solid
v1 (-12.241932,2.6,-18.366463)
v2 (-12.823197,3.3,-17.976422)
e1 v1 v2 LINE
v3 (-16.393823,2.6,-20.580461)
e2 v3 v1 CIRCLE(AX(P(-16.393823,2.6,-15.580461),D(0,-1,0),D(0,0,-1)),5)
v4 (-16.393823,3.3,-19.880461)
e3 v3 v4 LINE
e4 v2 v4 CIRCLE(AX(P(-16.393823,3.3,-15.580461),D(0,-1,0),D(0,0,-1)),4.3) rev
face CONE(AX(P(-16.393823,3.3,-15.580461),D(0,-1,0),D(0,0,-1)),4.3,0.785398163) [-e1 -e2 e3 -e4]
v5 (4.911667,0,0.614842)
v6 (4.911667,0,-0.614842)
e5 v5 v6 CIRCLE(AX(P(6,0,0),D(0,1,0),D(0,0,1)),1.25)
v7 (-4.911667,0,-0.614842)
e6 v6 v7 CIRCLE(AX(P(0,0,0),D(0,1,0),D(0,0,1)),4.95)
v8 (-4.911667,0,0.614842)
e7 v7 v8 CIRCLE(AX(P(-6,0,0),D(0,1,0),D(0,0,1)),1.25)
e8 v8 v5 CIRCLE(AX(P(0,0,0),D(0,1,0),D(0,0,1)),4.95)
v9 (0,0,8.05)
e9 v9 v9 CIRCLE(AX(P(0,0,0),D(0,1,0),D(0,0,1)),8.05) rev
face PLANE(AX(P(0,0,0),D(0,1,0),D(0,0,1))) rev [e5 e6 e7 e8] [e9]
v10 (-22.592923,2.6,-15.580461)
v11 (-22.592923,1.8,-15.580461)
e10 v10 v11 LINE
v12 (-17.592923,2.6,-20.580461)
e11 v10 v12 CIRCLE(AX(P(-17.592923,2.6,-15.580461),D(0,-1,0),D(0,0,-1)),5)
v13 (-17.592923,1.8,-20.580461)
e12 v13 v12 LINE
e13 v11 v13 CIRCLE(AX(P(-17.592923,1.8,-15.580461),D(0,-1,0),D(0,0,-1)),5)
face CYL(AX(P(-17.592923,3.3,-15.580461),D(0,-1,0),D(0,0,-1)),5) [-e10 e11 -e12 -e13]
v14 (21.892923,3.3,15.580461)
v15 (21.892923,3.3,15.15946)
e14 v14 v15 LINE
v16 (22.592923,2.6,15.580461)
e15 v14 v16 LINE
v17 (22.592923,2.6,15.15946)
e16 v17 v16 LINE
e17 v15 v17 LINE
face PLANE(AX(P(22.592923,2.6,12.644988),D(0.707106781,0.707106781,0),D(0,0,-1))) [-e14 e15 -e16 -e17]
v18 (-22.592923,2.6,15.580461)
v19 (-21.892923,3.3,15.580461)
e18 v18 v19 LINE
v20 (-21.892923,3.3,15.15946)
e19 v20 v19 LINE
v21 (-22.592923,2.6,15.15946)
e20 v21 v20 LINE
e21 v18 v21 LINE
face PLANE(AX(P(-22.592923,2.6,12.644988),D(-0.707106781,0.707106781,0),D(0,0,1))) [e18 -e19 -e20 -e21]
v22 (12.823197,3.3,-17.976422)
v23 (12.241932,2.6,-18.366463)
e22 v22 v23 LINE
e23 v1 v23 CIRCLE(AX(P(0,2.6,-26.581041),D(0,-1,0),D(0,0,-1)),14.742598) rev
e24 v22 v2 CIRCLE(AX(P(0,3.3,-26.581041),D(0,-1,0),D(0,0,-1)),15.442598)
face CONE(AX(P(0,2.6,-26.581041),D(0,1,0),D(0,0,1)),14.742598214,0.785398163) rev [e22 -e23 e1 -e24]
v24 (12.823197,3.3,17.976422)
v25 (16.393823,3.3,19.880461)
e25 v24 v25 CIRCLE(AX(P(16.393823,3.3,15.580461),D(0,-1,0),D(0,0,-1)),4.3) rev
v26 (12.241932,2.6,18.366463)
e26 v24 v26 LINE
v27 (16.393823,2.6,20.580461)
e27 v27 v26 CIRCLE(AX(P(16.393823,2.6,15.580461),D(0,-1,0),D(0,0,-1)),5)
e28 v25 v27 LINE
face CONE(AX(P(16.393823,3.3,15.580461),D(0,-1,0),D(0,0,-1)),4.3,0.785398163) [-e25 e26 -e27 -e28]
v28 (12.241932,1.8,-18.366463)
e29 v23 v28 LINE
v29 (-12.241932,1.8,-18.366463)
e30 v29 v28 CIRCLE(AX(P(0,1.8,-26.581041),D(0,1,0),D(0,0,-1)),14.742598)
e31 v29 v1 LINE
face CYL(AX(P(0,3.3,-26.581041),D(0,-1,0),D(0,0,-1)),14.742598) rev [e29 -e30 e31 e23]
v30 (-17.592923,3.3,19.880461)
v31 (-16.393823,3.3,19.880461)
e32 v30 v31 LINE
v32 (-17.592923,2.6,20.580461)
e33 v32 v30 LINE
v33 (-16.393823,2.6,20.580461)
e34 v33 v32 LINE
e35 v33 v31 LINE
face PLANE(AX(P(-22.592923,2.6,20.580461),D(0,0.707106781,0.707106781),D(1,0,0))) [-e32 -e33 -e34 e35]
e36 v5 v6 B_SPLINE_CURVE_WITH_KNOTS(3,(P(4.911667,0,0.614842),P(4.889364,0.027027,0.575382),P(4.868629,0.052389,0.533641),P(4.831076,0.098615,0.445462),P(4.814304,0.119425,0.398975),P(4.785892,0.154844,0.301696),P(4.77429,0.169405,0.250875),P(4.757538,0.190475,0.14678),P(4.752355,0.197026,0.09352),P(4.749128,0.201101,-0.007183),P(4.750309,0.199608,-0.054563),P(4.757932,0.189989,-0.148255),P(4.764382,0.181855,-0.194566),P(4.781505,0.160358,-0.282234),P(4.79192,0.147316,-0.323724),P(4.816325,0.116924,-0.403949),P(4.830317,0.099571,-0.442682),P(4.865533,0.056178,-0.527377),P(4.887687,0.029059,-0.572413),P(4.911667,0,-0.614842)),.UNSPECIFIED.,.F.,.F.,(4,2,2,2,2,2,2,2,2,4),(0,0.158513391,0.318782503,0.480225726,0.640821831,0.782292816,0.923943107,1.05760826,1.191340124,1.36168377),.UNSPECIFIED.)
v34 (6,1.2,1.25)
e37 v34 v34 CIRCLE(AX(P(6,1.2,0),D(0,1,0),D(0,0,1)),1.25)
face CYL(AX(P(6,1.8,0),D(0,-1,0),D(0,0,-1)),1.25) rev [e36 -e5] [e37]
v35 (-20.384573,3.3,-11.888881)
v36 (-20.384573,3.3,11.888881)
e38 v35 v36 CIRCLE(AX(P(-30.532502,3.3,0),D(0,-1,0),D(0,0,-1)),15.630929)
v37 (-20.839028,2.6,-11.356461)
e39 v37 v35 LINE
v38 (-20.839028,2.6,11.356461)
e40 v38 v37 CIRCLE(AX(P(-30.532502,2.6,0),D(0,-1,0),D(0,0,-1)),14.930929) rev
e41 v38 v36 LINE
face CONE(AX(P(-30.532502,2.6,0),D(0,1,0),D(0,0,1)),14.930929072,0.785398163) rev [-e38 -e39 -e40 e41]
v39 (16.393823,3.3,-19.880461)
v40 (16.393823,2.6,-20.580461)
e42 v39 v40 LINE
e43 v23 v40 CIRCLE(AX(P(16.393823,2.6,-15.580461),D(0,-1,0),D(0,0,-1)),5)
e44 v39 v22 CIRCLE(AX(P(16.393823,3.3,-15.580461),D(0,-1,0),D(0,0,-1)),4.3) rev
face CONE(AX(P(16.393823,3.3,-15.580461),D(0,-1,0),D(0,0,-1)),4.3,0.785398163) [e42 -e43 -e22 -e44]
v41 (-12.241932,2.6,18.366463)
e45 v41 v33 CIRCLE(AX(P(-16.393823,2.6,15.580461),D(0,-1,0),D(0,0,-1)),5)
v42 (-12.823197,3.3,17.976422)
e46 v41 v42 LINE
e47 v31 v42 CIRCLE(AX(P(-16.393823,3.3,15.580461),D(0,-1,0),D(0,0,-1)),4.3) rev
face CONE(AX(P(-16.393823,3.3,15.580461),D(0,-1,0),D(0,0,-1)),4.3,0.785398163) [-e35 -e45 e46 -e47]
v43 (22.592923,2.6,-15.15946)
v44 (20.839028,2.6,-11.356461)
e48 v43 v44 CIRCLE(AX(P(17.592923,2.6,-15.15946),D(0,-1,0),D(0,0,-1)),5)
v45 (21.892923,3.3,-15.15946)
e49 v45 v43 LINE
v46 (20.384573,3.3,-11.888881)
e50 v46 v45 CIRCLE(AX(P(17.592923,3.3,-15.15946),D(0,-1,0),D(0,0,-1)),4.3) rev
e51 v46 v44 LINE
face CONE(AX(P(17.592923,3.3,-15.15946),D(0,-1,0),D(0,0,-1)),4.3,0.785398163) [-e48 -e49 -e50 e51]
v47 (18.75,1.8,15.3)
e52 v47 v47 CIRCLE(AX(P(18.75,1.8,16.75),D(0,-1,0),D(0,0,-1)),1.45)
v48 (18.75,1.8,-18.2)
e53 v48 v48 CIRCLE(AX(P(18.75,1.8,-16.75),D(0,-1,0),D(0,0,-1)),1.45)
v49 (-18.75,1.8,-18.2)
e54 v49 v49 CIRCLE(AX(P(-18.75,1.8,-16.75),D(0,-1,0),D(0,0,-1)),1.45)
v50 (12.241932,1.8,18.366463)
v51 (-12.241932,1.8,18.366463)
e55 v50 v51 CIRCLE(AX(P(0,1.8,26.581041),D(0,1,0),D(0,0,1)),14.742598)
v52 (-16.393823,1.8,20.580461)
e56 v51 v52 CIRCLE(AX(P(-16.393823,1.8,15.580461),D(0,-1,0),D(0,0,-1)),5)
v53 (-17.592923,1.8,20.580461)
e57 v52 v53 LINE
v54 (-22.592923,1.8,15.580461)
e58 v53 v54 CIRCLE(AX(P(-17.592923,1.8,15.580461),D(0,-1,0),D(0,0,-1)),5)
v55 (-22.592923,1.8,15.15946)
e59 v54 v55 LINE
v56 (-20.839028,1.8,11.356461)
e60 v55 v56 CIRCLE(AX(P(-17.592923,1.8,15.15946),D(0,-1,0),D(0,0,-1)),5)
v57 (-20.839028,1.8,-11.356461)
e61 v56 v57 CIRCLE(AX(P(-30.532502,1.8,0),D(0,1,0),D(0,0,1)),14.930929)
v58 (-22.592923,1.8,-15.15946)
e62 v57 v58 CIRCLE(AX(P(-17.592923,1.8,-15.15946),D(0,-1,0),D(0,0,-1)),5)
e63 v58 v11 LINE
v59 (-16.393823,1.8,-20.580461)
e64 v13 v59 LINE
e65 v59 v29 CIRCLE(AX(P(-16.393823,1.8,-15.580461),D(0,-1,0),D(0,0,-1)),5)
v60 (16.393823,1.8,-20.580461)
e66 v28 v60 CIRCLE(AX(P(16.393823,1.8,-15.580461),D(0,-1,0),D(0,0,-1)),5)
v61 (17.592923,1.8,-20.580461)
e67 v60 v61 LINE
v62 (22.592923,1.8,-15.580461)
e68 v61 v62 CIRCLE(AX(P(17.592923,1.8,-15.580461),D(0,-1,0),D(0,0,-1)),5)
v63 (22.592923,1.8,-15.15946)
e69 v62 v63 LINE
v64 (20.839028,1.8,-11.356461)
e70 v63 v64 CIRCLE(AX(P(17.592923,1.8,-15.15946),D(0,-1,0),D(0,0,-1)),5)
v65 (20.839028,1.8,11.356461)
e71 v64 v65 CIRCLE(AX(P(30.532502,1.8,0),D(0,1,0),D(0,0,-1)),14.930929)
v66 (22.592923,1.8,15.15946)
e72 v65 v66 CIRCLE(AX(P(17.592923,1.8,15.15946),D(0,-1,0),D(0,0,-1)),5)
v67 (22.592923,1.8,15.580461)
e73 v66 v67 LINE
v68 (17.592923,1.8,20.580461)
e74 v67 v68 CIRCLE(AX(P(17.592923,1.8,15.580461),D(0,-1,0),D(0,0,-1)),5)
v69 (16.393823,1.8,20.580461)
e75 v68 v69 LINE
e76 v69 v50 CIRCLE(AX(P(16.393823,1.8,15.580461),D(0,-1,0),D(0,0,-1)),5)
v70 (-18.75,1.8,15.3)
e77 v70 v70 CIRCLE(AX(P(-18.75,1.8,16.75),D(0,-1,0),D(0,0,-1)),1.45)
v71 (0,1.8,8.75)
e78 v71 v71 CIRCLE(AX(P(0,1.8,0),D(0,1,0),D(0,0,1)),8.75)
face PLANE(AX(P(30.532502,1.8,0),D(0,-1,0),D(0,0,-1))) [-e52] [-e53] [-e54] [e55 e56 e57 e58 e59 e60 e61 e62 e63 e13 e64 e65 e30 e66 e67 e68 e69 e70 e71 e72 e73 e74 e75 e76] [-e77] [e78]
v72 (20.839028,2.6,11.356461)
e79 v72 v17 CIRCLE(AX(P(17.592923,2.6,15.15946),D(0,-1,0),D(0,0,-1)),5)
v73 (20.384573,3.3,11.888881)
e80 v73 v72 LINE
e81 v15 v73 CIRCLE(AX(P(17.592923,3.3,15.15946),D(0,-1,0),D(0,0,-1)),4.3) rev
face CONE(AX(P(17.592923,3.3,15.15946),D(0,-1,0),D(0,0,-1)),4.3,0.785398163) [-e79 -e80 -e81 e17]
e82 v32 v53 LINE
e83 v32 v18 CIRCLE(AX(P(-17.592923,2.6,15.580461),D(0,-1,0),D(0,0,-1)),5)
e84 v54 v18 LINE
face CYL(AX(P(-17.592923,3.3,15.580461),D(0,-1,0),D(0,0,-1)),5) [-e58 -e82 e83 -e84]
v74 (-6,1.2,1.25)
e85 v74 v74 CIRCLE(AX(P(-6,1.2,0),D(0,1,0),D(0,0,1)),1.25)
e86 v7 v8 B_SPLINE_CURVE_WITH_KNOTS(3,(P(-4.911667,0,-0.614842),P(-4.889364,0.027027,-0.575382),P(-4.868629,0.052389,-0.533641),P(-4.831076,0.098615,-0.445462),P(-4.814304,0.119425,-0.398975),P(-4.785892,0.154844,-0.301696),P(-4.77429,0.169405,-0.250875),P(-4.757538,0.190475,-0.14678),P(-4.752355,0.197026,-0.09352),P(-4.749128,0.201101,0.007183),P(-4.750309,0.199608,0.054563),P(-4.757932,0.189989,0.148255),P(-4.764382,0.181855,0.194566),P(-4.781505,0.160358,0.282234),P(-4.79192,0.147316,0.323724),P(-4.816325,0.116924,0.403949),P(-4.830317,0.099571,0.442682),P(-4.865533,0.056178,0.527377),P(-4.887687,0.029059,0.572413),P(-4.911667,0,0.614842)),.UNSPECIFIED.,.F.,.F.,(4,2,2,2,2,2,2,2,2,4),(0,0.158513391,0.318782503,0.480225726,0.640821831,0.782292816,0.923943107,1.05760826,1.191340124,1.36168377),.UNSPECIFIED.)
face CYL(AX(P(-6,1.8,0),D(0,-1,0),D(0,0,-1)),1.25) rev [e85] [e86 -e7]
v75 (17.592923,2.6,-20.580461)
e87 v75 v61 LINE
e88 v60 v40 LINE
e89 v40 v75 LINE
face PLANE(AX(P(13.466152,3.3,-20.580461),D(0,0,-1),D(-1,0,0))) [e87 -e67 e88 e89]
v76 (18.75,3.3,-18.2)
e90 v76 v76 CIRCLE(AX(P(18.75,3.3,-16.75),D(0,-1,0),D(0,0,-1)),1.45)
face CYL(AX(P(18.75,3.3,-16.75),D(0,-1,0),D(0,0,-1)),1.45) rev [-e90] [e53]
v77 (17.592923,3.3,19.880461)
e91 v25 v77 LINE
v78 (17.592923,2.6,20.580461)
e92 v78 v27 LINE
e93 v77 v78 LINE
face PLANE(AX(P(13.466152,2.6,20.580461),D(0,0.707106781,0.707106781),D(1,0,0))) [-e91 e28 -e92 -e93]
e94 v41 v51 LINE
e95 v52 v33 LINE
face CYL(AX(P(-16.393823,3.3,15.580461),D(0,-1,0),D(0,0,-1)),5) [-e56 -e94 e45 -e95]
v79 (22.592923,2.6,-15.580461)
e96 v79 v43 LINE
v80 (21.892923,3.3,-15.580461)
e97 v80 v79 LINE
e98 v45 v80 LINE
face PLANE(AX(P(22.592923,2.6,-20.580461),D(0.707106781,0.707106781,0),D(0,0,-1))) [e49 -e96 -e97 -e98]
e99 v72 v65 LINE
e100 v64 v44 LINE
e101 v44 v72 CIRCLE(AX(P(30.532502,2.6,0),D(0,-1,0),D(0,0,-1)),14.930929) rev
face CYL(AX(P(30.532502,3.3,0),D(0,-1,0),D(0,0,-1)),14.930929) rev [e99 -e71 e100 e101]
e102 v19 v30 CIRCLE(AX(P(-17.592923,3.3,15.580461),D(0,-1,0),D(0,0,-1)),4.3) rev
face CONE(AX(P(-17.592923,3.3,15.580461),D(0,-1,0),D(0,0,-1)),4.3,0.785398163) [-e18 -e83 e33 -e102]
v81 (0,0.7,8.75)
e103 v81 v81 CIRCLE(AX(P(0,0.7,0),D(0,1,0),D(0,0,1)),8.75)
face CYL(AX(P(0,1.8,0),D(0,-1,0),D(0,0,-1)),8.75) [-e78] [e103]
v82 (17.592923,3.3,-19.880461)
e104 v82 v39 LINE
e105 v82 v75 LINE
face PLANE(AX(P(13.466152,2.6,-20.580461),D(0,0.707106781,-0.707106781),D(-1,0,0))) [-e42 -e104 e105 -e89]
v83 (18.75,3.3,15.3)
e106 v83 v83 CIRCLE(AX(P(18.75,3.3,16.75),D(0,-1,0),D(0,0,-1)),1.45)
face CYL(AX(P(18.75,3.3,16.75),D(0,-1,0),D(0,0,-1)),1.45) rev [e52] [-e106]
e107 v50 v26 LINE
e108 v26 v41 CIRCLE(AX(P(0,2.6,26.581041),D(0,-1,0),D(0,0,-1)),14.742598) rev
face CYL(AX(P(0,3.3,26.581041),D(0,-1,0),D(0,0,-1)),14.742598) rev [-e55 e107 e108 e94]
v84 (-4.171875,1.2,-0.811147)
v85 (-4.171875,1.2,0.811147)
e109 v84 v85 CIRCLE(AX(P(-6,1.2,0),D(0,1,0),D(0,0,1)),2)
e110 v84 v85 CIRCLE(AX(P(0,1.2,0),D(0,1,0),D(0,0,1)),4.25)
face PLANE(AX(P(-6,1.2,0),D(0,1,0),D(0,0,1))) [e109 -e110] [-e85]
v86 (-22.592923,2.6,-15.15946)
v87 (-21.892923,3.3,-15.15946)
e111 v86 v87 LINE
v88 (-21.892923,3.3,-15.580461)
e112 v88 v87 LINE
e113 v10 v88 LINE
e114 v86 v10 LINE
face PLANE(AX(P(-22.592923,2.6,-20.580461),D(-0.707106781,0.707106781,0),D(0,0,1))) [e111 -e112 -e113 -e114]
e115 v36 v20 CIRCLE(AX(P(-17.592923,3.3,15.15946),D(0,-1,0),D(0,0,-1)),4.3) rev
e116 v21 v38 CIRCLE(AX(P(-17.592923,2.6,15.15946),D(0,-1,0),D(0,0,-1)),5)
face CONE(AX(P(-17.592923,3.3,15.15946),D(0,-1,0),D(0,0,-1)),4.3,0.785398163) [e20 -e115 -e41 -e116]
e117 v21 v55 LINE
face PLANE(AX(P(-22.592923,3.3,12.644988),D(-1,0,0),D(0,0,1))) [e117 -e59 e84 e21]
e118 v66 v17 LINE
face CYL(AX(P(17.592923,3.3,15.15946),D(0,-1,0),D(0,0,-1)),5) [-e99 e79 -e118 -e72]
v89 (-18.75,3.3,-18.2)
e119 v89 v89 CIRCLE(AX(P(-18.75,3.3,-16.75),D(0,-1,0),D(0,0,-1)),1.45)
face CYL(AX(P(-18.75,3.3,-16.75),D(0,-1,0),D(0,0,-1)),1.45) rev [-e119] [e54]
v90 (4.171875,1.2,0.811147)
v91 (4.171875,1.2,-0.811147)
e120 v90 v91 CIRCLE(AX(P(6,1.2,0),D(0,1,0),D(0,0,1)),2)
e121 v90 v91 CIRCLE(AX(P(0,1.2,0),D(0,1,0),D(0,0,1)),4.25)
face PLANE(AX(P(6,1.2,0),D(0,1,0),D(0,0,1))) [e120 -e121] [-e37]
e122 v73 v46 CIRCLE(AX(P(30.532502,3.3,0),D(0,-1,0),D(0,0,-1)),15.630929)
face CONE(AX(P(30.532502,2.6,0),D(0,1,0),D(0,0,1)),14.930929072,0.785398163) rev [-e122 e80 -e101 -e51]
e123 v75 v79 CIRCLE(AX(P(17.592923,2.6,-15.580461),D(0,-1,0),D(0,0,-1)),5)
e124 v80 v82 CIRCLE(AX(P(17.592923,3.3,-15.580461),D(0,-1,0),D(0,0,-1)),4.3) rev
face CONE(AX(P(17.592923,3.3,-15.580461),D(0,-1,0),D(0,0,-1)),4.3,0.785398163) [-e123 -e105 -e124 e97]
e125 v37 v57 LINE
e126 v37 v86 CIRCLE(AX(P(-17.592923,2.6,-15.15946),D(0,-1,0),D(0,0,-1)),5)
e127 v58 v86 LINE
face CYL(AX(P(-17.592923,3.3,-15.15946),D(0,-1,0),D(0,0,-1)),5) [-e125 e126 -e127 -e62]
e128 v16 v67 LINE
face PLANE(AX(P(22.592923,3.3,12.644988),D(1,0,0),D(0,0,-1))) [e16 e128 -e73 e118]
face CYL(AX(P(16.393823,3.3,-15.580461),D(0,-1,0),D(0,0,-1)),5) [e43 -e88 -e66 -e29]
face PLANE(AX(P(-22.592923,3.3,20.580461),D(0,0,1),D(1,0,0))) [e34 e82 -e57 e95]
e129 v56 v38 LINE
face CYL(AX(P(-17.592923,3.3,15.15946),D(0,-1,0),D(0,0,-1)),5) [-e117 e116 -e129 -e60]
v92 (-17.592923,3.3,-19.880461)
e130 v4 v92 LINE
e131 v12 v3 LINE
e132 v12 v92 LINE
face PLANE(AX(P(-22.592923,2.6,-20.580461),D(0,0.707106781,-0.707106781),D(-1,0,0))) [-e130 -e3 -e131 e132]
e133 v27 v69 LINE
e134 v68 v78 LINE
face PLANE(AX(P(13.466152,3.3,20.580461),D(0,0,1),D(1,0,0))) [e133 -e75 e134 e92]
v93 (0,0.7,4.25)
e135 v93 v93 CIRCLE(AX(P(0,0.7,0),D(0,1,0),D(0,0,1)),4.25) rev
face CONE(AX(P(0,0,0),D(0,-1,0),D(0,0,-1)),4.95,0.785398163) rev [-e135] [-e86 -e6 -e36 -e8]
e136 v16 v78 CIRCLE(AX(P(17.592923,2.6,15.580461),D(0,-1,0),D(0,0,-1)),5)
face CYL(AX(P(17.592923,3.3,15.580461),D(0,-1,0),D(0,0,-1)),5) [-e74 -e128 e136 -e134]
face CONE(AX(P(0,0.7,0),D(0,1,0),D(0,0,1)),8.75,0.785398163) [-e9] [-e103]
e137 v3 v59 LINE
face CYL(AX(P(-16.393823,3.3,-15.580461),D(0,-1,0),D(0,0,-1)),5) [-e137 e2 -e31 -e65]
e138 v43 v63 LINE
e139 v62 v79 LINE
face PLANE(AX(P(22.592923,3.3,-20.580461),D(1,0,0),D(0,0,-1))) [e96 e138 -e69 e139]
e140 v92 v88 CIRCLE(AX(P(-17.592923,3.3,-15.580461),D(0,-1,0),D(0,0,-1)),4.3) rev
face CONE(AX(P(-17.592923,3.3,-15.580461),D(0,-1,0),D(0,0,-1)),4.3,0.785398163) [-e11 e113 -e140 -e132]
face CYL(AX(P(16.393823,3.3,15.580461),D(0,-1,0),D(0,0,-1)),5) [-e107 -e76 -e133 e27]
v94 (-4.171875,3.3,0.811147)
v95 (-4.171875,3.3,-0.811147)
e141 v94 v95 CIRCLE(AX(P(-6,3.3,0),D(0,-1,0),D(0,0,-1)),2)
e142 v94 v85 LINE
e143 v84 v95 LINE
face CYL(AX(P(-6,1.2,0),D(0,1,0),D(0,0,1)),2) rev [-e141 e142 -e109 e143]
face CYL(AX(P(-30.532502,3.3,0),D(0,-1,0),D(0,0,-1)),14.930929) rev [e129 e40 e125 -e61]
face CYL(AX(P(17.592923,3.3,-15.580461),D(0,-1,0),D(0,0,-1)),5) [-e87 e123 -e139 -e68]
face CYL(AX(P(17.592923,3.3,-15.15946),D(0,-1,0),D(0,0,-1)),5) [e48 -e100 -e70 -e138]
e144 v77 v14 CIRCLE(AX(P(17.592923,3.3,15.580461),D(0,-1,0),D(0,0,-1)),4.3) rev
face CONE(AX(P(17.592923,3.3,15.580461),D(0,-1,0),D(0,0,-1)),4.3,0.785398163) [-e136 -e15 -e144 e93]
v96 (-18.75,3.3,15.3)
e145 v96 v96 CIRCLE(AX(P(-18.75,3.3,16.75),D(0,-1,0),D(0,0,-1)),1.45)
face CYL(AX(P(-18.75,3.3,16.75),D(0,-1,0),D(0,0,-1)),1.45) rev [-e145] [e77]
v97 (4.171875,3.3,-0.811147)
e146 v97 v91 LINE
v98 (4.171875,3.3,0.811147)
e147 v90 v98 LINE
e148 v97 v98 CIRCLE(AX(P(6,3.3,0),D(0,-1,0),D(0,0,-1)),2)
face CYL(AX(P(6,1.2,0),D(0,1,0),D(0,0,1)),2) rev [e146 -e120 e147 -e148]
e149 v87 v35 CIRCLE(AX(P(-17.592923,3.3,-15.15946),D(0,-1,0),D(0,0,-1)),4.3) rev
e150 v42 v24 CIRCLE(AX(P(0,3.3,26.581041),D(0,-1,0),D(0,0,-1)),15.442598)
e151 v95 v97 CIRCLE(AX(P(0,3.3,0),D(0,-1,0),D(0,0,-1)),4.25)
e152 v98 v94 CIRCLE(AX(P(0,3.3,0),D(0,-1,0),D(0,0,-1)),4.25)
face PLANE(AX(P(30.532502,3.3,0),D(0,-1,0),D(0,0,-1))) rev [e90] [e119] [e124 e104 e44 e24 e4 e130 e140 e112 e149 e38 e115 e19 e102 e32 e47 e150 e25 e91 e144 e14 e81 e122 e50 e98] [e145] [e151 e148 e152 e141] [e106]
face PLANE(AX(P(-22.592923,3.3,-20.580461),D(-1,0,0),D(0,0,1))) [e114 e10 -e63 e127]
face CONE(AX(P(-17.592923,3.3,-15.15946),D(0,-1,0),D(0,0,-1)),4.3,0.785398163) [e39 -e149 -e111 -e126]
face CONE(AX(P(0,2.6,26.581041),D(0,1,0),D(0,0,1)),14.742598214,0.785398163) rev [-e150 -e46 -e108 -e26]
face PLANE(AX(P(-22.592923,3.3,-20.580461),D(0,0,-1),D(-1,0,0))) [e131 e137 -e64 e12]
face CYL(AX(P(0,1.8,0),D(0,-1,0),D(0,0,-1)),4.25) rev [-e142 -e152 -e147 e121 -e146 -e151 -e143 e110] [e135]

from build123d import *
from build123d.topology import SkipClean

# Parameters (mm, degrees)
SKETCH1_R           = 8.75
SKETCH1_R_2         = 4.25
SKETCH1_R_3         = 1.25
BOSS_EXTRUDE1_DEPTH = 1.8
SKETCH2_R           = 2
CUT_EXTRUDE1_DEPTH  = 0.6
SKETCH3_R           = 1.45
BOSS_EXTRUDE2_DEPTH = 1.5
FILLET1_R           = 5
CHAMFER1_SIZE       = 0.7
CHAMFER2_SIZE       = 0.7


with BuildPart() as part:
    # Sketch1 → Boss-Extrude1 (new body)
    with BuildSketch(Plane(origin=(0, 0, 0), x_dir=(1, 0, 0), z_dir=(0, 1, 0))):
        with Locations(Location((0, 0, 0), (0, 0, 270))):
            Circle(SKETCH1_R)
        with Locations(Location((0, 0, 0), (0, 0, 270))):
            Circle(SKETCH1_R_2, mode=Mode.SUBTRACT)
        with Locations(Location((-6, 0, 0), (0, 0, 270))):
            Circle(SKETCH1_R_3, mode=Mode.SUBTRACT)
        with Locations(Location((6, 0, 0), (0, 0, 270))):
            Circle(SKETCH1_R_3, mode=Mode.SUBTRACT)
    extrude(amount=BOSS_EXTRUDE1_DEPTH)

    # Sketch2 → Cut-Extrude1 (cut)
    with BuildSketch(Plane(origin=(0, 1.8, 0), x_dir=(1, 0, 0), z_dir=(0, 1, 0))):
        with Locations((-6, 0)):
            Circle(SKETCH2_R)
        with Locations((6, 0)):
            Circle(SKETCH2_R)
    extrude(amount=-CUT_EXTRUDE1_DEPTH, mode=Mode.SUBTRACT)

    # Sketch3 → Boss-Extrude2 (add)
    with SkipClean():  # the faces are left unmerged after this step: merging them gives an invalid solid
        with BuildSketch(Plane.XZ.offset(-1.8)):
            with BuildLine():
                Line((-22.592922776, -20.580461491), (-13.466151705, -20.580461491))
                ThreePointArc((-13.466151705, -20.580461491), (0, -11.838443279), (13.466151705, -20.580461491))
                Line((13.466151705, -20.580461491), (22.592922776, -20.580461491))
                Line((22.592922776, -20.580461491), (22.592922776, -12.644988276))
                ThreePointArc((22.592922776, -12.644988276), (15.601572689, 0), (22.592922776, 12.644988276))
                Line((22.592922776, 12.644988276), (22.592922776, 20.580461491))
                Line((22.592922776, 20.580461491), (13.466151705, 20.580461491))
                ThreePointArc((13.466151705, 20.580461491), (0, 11.838443279), (-13.466151705, 20.580461491))
                Line((-13.466151705, 20.580461491), (-22.592922776, 20.580461491))
                Line((-22.592922776, 20.580461491), (-22.592922776, 12.644988276))
                ThreePointArc((-22.592922776, 12.644988276), (-15.601572689, 0), (-22.592922776, -12.644988276))
                Line((-22.592922776, -12.644988276), (-22.592922776, -20.580461491))
            make_face()
            with Locations(Location((18.75, 16.75, 0), (0, 0, 270))):
                Circle(SKETCH3_R, mode=Mode.SUBTRACT)
            with Locations(Location((18.75, -16.75, 0), (0, 0, 270))):
                Circle(SKETCH3_R, mode=Mode.SUBTRACT)
            with Locations(Location((-18.75, -16.75, 0), (0, 0, 270))):
                Circle(SKETCH3_R, mode=Mode.SUBTRACT)
            with Locations(Location((-18.75, 16.75, 0), (0, 0, 270))):
                Circle(SKETCH3_R, mode=Mode.SUBTRACT)
            with BuildLine():
                ThreePointArc((-4.171875, -0.81114671), (0, -4.25), (4.171875, -0.81114671))
                ThreePointArc((4.171875, -0.81114671), (8, 0), (4.171875, 0.81114671))
                ThreePointArc((4.171875, 0.81114671), (0, 4.25), (-4.171875, 0.81114671))
                ThreePointArc((-4.171875, 0.81114671), (-8, 0), (-4.171875, -0.81114671))
            make_face(mode=Mode.SUBTRACT)
        extrude(amount=-BOSS_EXTRUDE2_DEPTH)

    # Fillet1
    fillet1_edges = [part.edges().sort_by_distance(p)[0] for p in [
        (13.466151705, 2.55, 20.580461491),
        (22.592922776, 2.55, 20.580461491),
        (22.592922776, 2.55, 12.644988276),
        (22.592922776, 2.55, -12.644988276),
        (22.592922776, 2.55, -20.580461491),
        (13.466151705, 2.55, -20.580461491),
        (-13.466151705, 2.55, -20.580461491),
        (-22.592922776, 2.55, -20.580461491),
        (-22.592922776, 2.55, -12.644988276),
        (-22.592922776, 2.55, 12.644988276),
        (-22.592922776, 2.55, 20.580461491),
        (-13.466151705, 2.55, 20.580461491),
    ]]
    fillet(fillet1_edges, radius=FILLET1_R)

    # Chamfer1
    # the kernel refuses this chamfer: 0.7 mm, written as the material it takes off along each edge
    with BuildSketch(Plane(origin=(0, 0, 0), x_dir=(0, 0, 1), z_dir=(-1, 0, 0))) as chamfer1_piece_1:
        Polygon((8.75, CHAMFER1_SIZE), (8.75 - CHAMFER1_SIZE, 0), (8.75, 0), align=None)
    revolve(axis=Axis((0, 0, 0), (0, 1, 0)), mode=Mode.SUBTRACT)
    with BuildSketch(Plane(origin=(0, 0, 0), x_dir=(0, 0, 1), z_dir=(-1, 0, 0))) as chamfer1_piece_2:
        Polygon((4.25 + CHAMFER1_SIZE, 0), (4.25, CHAMFER1_SIZE), (4.25, 0), align=None)
    revolve(axis=Axis((0, 0, 0), (0, 1, 0)), mode=Mode.SUBTRACT)

    # Chamfer2
    chamfer2_edges = [part.edges().sort_by_distance(p)[0] for p in [
        (15.601572689, 3.3, 0),
        (16.993372755, 3.3, 20.580461491),
        (22.592922776, 3.3, 15.369960777),
        (16.993372755, 3.3, -20.580461491),
        (0, 3.3, -11.838443279),
        (-16.993372755, 3.3, -20.580461491),
        (-22.592922776, 3.3, -15.369960777),
        (-15.601572689, 3.3, 0),
        (-22.592922776, 3.3, 15.369960777),
        (-16.993372755, 3.3, 20.580461491),
        (0, 3.3, 11.838443279),
        (14.041165239, 3.3, 19.992377481),
        (21.128456682, 3.3, 19.115995397),
        (22.133326206, 3.3, 13.065483774),
        (-21.128456682, 3.3, 19.115995397),
        (-14.041165239, 3.3, 19.992377481),
        (-22.133326206, 3.3, 13.065483774),
        (-22.133326206, 3.3, -13.065483774),
        (14.041165239, 3.3, -19.992377481),
        (-21.128456682, 3.3, -19.115995397),
        (-14.041165239, 3.3, -19.992377481),
        (21.128456682, 3.3, -19.115995397),
        (22.133326206, 3.3, -13.065483774),
        (22.592922776, 3.3, -15.369960777),
    ]]
    chamfer(chamfer2_edges, length=CHAMFER2_SIZE)


solid = part.part
